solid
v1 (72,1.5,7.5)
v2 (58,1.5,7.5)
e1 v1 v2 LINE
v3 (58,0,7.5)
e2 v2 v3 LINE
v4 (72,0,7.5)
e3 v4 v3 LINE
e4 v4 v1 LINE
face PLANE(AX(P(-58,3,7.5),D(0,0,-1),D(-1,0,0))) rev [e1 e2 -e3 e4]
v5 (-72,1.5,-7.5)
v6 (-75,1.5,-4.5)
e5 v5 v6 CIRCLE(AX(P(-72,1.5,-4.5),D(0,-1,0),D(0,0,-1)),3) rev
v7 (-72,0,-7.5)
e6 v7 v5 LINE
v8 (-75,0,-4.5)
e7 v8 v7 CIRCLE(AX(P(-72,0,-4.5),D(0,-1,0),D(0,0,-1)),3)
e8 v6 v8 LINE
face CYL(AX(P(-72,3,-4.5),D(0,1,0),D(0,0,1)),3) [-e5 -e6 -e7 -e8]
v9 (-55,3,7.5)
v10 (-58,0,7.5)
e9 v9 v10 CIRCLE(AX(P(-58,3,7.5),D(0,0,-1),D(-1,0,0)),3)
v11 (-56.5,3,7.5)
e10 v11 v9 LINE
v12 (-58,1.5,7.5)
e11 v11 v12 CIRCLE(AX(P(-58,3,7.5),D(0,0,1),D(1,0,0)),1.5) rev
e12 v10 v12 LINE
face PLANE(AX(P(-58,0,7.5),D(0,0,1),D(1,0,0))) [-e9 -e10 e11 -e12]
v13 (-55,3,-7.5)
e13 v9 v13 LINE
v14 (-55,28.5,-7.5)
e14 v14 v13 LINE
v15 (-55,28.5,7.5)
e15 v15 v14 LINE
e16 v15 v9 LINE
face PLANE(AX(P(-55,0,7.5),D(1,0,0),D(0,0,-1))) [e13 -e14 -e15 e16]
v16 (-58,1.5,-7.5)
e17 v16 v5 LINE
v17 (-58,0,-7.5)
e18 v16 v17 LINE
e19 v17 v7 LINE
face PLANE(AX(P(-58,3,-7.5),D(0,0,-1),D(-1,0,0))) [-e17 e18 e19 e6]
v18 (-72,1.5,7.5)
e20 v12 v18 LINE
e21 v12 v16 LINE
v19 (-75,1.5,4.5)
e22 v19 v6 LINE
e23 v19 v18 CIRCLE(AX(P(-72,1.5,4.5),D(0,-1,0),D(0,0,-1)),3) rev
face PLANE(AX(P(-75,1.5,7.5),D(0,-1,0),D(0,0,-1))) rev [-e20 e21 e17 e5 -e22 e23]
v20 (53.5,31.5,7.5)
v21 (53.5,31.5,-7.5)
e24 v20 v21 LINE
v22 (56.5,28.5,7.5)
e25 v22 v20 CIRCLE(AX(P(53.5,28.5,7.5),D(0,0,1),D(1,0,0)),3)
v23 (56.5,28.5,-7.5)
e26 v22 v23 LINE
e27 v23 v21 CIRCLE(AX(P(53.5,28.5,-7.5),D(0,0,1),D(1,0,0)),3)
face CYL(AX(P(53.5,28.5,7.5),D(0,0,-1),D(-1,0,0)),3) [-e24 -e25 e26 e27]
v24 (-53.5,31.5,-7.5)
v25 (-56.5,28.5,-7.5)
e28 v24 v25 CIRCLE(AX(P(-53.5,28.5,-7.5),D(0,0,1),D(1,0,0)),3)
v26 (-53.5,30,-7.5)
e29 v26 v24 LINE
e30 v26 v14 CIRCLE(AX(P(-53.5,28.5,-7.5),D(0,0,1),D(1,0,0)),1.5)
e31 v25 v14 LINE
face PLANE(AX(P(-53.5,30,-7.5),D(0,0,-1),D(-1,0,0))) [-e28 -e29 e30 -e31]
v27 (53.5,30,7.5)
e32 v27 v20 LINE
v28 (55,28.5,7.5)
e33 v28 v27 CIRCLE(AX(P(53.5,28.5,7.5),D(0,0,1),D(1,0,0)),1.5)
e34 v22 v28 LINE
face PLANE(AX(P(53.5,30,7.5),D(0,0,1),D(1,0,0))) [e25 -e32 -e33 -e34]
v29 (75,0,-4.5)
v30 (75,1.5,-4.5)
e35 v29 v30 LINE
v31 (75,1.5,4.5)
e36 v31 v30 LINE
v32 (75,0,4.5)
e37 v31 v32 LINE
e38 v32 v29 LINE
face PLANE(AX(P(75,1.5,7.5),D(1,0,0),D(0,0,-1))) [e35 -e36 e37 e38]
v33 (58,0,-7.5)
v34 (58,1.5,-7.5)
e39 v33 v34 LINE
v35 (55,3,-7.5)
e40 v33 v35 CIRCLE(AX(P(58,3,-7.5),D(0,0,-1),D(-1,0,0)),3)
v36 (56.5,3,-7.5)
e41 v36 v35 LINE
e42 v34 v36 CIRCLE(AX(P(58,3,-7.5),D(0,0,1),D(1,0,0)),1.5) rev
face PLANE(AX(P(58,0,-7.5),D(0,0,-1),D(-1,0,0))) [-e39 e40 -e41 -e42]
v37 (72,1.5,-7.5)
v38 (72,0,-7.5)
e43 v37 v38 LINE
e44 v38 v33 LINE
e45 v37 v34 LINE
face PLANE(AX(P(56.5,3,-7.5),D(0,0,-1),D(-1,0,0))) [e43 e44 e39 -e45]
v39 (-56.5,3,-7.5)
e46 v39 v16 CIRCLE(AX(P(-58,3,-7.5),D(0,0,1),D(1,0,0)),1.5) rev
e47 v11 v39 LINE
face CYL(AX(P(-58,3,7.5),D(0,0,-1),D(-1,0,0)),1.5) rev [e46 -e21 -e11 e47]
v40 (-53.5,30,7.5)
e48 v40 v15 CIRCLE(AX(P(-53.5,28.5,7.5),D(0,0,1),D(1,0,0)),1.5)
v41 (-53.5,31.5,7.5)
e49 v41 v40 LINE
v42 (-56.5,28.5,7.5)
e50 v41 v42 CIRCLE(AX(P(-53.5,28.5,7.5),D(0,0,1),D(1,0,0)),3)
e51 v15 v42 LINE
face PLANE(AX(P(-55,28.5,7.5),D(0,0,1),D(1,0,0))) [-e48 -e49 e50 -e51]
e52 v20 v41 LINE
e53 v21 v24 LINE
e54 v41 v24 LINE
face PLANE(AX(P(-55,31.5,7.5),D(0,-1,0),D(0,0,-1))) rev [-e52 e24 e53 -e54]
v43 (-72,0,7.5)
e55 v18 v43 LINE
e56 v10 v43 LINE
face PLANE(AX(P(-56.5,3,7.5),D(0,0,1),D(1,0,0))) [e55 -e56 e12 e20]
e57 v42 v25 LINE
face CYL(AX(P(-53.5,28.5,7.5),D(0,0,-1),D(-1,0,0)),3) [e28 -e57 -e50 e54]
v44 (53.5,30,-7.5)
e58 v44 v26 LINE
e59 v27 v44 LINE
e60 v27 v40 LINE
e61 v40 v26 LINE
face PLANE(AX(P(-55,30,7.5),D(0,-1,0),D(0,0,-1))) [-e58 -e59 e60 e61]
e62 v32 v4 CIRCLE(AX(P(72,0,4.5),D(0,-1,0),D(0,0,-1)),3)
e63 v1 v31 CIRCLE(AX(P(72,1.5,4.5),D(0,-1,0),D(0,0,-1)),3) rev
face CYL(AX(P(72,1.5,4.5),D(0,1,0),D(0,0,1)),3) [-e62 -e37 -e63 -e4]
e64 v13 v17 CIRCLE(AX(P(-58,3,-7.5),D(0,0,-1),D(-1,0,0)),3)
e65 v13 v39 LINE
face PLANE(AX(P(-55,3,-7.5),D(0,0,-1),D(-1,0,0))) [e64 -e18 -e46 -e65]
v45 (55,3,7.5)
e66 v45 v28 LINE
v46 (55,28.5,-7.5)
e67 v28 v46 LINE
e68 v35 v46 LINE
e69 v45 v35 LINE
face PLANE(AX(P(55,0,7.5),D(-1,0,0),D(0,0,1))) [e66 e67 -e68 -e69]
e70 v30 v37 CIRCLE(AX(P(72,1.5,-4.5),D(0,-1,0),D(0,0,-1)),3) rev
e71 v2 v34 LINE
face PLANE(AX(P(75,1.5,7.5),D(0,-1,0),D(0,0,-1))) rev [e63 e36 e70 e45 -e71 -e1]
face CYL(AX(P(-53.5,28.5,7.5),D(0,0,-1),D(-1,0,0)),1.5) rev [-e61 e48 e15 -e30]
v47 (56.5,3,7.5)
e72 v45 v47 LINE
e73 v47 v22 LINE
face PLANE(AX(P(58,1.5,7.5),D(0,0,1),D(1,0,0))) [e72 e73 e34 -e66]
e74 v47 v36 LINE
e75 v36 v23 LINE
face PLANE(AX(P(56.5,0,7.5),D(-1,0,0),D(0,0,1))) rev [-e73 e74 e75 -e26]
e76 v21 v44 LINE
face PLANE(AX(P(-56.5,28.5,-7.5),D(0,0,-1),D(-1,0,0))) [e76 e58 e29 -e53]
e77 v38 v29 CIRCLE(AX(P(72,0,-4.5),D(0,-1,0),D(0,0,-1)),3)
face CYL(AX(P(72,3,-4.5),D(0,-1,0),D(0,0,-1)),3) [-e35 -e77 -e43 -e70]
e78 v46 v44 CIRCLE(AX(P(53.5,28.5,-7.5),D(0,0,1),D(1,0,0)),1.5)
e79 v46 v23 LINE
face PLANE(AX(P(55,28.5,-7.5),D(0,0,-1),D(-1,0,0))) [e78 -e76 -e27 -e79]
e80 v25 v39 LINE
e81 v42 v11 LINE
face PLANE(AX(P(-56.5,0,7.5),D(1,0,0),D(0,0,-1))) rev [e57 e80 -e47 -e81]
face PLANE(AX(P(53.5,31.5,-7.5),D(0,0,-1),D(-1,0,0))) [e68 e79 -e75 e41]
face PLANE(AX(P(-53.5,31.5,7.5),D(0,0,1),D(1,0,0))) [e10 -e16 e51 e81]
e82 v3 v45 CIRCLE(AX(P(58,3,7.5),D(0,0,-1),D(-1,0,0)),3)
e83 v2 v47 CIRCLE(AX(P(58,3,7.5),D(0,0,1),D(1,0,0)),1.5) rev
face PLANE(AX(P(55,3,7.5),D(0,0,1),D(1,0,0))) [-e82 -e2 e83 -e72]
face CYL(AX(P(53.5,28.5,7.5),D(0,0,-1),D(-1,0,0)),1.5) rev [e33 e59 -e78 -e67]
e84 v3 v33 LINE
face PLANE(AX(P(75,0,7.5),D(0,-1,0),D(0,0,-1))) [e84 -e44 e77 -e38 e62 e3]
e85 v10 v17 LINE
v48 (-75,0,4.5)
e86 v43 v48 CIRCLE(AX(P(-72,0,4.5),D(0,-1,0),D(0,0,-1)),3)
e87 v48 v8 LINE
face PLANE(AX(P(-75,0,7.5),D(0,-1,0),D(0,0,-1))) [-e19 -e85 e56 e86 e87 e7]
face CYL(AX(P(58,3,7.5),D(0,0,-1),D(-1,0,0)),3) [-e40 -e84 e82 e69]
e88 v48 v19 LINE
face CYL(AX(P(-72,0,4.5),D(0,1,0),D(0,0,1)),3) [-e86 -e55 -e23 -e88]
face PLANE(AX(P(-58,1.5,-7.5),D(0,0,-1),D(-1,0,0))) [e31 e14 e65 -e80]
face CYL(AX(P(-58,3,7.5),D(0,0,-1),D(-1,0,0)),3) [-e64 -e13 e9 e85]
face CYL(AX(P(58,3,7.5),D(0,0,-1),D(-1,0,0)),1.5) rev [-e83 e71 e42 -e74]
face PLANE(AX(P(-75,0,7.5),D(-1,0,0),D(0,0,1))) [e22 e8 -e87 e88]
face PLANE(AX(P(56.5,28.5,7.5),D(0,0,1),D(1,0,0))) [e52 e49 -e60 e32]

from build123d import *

# Parameters (mm, degrees)
BASE_FLANGE1_DEPTH = 7.5
FILLET1_R          = 3


# Sheet-metal steps are written as plain solids
with BuildPart() as part:
    # Sketch1 → Base-Flange1 (new, symmetric)
    with BuildSketch(Plane.XY):
        with BuildLine():
            Line((-75, 0), (-58, 0))
            ThreePointArc((-58, 0), (-55.878679656, 0.878679656), (-55, 3))
            Line((-55, 3), (-55, 28.5))
            ThreePointArc((-55, 28.5), (-54.560660172, 29.560660172), (-53.5, 30))
            Line((-53.5, 30), (53.5, 30))
            ThreePointArc((53.5, 30), (54.560660172, 29.560660172), (55, 28.5))
            Line((55, 28.5), (55, 3))
            ThreePointArc((55, 3), (55.878679656, 0.878679656), (58, 0))
            Line((58, 0), (75, 0))
            Line((75, 0), (75, 1.5))
            Line((75, 1.5), (58, 1.5))
            ThreePointArc((58, 1.5), (56.939339828, 1.939339828), (56.5, 3))
            Line((56.5, 3), (56.5, 28.5))
            ThreePointArc((56.5, 28.5), (55.621320344, 30.621320344), (53.5, 31.5))
            Line((53.5, 31.5), (-53.5, 31.5))
            ThreePointArc((-53.5, 31.5), (-55.621320344, 30.621320344), (-56.5, 28.5))
            Line((-56.5, 28.5), (-56.5, 3))
            ThreePointArc((-56.5, 3), (-56.939339828, 1.939339828), (-58, 1.5))
            Line((-58, 1.5), (-75, 1.5))
            Line((-75, 1.5), (-75, 0))
        make_face()
    extrude(amount=BASE_FLANGE1_DEPTH, both=True)

    # Fillet1
    fillet1_edges = [part.edges().sort_by_distance(p)[0] for p in [
        (75, 0.75, -7.5),
        (-75, 0.75, -7.5),
        (75, 0.75, 7.5),
        (-75, 0.75, 7.5),
    ]]
    fillet(fillet1_edges, radius=FILLET1_R)


solid = part.part
